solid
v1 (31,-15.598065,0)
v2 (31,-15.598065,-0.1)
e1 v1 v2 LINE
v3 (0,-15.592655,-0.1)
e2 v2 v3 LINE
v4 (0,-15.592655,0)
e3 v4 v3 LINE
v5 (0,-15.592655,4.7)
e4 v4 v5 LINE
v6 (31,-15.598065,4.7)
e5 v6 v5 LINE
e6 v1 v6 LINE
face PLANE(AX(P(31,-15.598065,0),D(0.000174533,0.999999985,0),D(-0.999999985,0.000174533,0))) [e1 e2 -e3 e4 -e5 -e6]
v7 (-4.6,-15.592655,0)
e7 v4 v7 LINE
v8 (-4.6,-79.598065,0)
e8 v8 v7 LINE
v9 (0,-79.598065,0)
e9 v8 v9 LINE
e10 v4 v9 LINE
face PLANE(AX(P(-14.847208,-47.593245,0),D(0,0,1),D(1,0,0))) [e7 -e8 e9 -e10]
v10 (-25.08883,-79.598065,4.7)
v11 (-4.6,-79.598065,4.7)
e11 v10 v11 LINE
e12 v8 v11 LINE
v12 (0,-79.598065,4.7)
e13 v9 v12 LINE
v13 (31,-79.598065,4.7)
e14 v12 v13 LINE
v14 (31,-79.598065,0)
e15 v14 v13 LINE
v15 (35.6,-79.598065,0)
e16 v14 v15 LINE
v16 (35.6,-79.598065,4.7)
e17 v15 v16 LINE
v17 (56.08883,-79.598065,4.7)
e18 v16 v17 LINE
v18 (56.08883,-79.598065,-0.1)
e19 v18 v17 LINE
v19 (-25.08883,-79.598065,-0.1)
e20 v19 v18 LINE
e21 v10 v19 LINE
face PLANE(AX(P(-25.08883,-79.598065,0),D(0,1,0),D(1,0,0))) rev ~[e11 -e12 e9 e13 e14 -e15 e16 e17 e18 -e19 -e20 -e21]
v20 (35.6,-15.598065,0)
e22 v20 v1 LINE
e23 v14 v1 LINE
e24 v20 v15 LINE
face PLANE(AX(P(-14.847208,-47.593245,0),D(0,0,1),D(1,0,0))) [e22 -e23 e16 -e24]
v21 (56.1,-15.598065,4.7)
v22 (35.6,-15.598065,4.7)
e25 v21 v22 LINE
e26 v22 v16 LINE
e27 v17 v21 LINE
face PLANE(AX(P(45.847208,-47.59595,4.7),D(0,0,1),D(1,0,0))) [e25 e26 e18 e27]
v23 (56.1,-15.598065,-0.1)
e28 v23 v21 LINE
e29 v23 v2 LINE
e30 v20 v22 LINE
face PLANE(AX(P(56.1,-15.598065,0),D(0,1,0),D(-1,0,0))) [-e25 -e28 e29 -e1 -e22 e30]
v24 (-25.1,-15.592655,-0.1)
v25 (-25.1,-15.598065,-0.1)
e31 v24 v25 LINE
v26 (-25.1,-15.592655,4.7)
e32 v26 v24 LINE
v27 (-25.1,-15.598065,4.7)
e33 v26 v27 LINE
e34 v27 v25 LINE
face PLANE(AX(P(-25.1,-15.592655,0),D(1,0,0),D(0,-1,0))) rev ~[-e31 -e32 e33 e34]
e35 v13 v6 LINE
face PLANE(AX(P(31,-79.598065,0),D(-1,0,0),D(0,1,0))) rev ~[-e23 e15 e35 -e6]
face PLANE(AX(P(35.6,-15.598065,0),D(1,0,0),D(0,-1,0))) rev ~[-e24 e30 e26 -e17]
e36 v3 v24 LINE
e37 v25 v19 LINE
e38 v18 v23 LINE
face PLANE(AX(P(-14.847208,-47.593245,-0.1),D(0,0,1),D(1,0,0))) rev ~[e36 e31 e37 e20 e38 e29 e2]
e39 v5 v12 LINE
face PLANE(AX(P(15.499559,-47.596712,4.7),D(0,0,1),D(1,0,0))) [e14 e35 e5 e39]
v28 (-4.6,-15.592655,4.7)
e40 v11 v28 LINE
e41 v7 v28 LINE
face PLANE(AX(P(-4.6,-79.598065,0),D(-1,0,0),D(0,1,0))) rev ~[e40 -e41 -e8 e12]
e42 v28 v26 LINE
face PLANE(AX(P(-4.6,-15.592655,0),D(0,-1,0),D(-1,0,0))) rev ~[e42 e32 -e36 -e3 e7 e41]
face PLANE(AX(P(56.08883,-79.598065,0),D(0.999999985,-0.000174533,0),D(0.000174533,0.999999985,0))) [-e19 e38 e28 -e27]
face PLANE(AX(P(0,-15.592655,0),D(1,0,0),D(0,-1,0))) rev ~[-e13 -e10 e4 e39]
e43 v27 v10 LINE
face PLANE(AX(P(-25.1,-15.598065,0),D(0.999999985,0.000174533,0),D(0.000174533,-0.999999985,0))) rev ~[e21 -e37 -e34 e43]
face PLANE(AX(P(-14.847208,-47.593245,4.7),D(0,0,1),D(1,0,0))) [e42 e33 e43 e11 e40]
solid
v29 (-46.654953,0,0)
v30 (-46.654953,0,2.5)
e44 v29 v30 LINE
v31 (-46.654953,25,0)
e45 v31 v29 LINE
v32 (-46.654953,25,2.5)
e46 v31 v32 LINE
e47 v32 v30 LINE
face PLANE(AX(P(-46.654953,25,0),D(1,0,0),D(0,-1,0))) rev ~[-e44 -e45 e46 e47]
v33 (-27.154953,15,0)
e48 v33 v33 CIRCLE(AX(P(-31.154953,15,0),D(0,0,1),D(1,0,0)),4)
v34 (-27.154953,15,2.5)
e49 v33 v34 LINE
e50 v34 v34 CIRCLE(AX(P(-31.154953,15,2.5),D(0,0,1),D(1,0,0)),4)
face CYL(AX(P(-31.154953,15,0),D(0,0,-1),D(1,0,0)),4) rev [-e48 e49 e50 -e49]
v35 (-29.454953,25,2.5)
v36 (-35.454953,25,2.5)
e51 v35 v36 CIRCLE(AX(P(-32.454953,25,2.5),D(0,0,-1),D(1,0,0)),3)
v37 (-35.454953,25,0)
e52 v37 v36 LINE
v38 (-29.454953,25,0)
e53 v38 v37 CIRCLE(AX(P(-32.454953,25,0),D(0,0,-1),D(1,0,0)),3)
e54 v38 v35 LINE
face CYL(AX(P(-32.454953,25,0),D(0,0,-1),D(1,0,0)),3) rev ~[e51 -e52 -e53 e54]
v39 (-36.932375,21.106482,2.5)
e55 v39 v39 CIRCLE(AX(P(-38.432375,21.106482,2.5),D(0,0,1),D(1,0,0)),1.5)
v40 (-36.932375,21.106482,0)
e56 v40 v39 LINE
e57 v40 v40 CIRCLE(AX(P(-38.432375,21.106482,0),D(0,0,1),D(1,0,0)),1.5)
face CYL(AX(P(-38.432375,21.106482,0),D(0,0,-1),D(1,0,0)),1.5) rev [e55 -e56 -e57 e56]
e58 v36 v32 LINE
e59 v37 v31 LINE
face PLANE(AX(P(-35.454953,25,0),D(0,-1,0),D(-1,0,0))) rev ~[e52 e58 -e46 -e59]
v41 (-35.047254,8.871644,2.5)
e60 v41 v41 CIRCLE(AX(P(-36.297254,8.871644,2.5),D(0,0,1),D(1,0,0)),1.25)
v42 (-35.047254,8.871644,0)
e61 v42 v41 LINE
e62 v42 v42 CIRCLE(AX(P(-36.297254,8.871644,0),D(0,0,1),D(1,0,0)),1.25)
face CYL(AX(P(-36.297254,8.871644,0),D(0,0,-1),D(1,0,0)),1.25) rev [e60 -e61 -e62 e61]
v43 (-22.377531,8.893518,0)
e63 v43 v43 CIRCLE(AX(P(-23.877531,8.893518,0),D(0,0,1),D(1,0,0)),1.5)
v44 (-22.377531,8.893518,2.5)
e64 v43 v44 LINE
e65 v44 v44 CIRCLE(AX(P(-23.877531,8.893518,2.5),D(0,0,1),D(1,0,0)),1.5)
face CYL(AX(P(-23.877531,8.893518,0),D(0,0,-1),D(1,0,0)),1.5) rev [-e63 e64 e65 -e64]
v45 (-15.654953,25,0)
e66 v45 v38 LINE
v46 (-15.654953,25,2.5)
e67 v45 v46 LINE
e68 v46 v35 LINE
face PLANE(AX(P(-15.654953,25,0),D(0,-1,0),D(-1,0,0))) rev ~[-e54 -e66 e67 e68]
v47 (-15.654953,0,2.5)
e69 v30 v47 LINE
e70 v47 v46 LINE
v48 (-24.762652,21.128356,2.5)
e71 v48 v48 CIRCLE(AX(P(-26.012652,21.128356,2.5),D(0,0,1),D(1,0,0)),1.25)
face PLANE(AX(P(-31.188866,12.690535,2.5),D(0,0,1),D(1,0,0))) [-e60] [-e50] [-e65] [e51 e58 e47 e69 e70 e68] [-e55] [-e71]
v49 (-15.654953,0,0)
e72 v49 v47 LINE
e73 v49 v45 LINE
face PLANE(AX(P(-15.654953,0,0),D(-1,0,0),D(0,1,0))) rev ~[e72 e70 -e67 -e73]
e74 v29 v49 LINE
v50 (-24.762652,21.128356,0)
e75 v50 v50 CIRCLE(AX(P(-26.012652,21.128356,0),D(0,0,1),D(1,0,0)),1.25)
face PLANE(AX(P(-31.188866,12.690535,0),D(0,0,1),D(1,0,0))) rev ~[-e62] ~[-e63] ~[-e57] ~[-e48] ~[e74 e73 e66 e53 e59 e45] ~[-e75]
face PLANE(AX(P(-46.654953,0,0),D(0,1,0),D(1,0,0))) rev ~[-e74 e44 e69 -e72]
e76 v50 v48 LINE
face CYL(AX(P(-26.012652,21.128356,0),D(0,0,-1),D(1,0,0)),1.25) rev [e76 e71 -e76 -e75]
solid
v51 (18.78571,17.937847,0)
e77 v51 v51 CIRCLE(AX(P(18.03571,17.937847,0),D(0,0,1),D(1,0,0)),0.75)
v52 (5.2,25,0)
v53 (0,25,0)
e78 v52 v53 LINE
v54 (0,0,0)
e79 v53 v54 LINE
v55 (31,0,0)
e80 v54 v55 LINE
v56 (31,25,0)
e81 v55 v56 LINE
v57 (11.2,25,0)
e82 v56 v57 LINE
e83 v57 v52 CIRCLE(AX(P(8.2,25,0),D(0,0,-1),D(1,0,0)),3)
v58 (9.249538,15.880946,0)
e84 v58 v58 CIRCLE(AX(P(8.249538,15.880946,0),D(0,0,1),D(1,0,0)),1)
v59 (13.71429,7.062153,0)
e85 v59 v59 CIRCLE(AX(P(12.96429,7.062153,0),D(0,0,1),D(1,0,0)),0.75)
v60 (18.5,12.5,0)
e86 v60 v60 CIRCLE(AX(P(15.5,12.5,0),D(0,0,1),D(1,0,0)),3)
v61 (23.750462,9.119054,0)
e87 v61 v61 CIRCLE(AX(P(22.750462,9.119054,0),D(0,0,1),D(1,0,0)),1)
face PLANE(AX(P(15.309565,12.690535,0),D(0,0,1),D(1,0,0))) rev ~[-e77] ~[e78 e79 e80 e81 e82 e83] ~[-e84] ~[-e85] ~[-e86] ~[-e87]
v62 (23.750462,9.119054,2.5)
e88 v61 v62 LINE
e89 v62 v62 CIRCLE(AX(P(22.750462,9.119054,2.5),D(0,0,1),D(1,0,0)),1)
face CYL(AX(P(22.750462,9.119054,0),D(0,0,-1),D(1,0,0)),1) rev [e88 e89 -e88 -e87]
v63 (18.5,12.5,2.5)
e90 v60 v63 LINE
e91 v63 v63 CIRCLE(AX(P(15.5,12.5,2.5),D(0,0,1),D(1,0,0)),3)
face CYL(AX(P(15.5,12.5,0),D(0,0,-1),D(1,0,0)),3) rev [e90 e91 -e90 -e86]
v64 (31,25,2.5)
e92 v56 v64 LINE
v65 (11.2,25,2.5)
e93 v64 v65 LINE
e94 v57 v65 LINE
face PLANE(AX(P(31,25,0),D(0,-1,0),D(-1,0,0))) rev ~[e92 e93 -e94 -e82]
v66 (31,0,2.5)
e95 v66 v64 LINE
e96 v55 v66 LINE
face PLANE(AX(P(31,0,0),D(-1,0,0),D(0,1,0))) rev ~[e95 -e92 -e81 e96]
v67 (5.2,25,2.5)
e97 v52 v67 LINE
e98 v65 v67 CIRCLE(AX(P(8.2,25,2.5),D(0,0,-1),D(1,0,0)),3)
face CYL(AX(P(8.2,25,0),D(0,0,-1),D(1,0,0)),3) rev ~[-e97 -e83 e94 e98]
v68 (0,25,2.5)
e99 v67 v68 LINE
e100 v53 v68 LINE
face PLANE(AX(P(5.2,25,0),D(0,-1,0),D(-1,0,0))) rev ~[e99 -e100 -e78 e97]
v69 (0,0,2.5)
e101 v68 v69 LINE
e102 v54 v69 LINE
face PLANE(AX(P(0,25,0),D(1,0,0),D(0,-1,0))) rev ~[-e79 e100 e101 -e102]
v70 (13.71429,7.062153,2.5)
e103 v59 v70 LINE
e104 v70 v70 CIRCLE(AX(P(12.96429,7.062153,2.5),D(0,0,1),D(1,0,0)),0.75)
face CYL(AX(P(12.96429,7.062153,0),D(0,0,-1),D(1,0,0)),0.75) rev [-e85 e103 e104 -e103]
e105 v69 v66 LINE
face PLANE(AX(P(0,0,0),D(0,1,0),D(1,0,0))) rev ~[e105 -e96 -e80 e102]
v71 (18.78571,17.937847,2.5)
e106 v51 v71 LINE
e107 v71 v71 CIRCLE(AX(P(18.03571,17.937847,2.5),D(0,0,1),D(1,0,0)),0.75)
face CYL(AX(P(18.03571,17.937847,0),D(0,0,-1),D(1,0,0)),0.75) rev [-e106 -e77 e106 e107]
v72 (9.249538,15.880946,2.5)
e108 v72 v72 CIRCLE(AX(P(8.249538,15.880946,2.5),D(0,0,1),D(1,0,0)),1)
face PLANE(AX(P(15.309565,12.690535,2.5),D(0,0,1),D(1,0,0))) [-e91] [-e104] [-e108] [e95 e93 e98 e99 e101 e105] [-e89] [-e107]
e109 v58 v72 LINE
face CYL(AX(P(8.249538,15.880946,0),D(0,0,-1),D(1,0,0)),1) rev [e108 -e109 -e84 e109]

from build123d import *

# Parameters (mm, degrees)
F1_R     = 0.75
F1_R_2   = 1
F1_R_3   = 3
F4_DEPTH = 2.5
F2_R     = 1.25
F2_R_2   = 1.5
F2_R_3   = 4
F3_W     = 4.6
F3_H     = 64
F5_DEPTH = 0.1
F6_DEPTH = 4.7


# Not quite as in the source:
# - ends of sketch curves that miss each other by under 0.0002 mm in the source are joined


with BuildPart() as f4:
    # F1 (on Top) → F4 (new body)
    with BuildSketch(Plane.XY):
        with BuildLine():
            Line((0, 25), (0, 0))
            Line((0, 0), (31, 0))
            Line((31, 0), (31, 25))
            Line((31, 25), (26.3, 25))
            Line((26.3, 25), (11.2, 25))
            ThreePointArc((11.2, 25), (8.2, 22), (5.2, 25))
            Line((5.2, 25), (0, 25))
        make_face()
        with Locations((12.9642904296, 7.0621532778)):
            Circle(F1_R, mode=Mode.SUBTRACT)
        with Locations((22.7504622963, 9.1190539061)):
            Circle(F1_R_2, mode=Mode.SUBTRACT)
        with Locations((8.2495377037, 15.8809460939)):
            Circle(F1_R_2, mode=Mode.SUBTRACT)
        with Locations((15.5, 12.5)):
            Circle(F1_R_3, mode=Mode.SUBTRACT)
        with Locations((18.0357095704, 17.9378467222)):
            Circle(F1_R, mode=Mode.SUBTRACT)
    extrude(amount=F4_DEPTH)


with BuildPart() as f4b:
    # F2 (on Top) → F4, piece 2 (new body)
    with BuildSketch(Plane.XY):
        with BuildLine():
            Line((-46.6549531966, 25), (-46.6549531966, 0))
            Line((-46.6549531966, 0), (-15.6549531966, 0))
            Line((-15.6549531966, 0), (-15.6549531966, 25))
            Line((-15.6549531966, 25), (-20.3549531966, 25))
            Line((-20.3549531966, 25), (-29.4549531966, 25))
            ThreePointArc((-29.4549531966, 25), (-32.4549531966, 22), (-35.4549531966, 25))
            Line((-35.4549531966, 25), (-46.6549531966, 25))
        make_face()
        with Locations((-36.2972540741, 8.871644455)):
            Circle(F2_R, mode=Mode.SUBTRACT)
        with Locations((-23.877530987, 8.893517708)):
            Circle(F2_R_2, mode=Mode.SUBTRACT)
        with Locations((-38.4323754063, 21.106482292)):
            Circle(F2_R_2, mode=Mode.SUBTRACT)
        with Locations((-31.1549531966, 15)):
            Circle(F2_R_3, mode=Mode.SUBTRACT)
        with Locations((-26.0126523192, 21.128355545)):
            Circle(F2_R, mode=Mode.SUBTRACT)
    extrude(amount=F4_DEPTH)


with BuildPart() as f5:
    # F3 (on Top) → F5 (new body)
    with BuildSketch(Plane.XY):
        Polygon((-25.0888298927, -79.5980651379), (-4.6, -79.5980651379), (-4.6, -15.5980651379), (-4.6, -15.5926546171), (-25.1, -15.5926546171), (-25.1, -15.5980651379), align=None)
        Polygon((-4.6, -79.5980651379), (0, -79.5980651379), (0, -15.5980651379), (0, -15.5926546171), (-4.6, -15.5926546171), (-4.6, -15.5980651379), align=None)
        Polygon((0, -15.5980651379), (0, -79.5980651379), (31, -79.5980651379), (31, -15.5980651379), (0, -15.5926546171), align=None)
        with Locations((33.3, -47.5980651379)):
            Rectangle(F3_W, F3_H)
        Polygon((35.6, -15.5980651379), (35.6, -79.5980651379), (56.0888298927, -79.5980651379), (56.1, -15.5980651379), align=None)
    extrude(amount=-F5_DEPTH)

    # F3 (on Top) → F6 (join)
    with BuildSketch(Plane.XY):
        Polygon((-25.0888298927, -79.5980651379), (-4.6, -79.5980651379), (-4.6, -15.5980651379), (-4.6, -15.5926546171), (-25.1, -15.5926546171), (-25.1, -15.5980651379), align=None)
        Polygon((0, -15.5980651379), (0, -79.5980651379), (31, -79.5980651379), (31, -15.5980651379), (0, -15.5926546171), align=None)
        Polygon((35.6, -15.5980651379), (35.6, -79.5980651379), (56.0888298927, -79.5980651379), (56.1, -15.5980651379), align=None)
    extrude(amount=F6_DEPTH)


solid = Compound([f4.part, f4b.part, f5.part])
